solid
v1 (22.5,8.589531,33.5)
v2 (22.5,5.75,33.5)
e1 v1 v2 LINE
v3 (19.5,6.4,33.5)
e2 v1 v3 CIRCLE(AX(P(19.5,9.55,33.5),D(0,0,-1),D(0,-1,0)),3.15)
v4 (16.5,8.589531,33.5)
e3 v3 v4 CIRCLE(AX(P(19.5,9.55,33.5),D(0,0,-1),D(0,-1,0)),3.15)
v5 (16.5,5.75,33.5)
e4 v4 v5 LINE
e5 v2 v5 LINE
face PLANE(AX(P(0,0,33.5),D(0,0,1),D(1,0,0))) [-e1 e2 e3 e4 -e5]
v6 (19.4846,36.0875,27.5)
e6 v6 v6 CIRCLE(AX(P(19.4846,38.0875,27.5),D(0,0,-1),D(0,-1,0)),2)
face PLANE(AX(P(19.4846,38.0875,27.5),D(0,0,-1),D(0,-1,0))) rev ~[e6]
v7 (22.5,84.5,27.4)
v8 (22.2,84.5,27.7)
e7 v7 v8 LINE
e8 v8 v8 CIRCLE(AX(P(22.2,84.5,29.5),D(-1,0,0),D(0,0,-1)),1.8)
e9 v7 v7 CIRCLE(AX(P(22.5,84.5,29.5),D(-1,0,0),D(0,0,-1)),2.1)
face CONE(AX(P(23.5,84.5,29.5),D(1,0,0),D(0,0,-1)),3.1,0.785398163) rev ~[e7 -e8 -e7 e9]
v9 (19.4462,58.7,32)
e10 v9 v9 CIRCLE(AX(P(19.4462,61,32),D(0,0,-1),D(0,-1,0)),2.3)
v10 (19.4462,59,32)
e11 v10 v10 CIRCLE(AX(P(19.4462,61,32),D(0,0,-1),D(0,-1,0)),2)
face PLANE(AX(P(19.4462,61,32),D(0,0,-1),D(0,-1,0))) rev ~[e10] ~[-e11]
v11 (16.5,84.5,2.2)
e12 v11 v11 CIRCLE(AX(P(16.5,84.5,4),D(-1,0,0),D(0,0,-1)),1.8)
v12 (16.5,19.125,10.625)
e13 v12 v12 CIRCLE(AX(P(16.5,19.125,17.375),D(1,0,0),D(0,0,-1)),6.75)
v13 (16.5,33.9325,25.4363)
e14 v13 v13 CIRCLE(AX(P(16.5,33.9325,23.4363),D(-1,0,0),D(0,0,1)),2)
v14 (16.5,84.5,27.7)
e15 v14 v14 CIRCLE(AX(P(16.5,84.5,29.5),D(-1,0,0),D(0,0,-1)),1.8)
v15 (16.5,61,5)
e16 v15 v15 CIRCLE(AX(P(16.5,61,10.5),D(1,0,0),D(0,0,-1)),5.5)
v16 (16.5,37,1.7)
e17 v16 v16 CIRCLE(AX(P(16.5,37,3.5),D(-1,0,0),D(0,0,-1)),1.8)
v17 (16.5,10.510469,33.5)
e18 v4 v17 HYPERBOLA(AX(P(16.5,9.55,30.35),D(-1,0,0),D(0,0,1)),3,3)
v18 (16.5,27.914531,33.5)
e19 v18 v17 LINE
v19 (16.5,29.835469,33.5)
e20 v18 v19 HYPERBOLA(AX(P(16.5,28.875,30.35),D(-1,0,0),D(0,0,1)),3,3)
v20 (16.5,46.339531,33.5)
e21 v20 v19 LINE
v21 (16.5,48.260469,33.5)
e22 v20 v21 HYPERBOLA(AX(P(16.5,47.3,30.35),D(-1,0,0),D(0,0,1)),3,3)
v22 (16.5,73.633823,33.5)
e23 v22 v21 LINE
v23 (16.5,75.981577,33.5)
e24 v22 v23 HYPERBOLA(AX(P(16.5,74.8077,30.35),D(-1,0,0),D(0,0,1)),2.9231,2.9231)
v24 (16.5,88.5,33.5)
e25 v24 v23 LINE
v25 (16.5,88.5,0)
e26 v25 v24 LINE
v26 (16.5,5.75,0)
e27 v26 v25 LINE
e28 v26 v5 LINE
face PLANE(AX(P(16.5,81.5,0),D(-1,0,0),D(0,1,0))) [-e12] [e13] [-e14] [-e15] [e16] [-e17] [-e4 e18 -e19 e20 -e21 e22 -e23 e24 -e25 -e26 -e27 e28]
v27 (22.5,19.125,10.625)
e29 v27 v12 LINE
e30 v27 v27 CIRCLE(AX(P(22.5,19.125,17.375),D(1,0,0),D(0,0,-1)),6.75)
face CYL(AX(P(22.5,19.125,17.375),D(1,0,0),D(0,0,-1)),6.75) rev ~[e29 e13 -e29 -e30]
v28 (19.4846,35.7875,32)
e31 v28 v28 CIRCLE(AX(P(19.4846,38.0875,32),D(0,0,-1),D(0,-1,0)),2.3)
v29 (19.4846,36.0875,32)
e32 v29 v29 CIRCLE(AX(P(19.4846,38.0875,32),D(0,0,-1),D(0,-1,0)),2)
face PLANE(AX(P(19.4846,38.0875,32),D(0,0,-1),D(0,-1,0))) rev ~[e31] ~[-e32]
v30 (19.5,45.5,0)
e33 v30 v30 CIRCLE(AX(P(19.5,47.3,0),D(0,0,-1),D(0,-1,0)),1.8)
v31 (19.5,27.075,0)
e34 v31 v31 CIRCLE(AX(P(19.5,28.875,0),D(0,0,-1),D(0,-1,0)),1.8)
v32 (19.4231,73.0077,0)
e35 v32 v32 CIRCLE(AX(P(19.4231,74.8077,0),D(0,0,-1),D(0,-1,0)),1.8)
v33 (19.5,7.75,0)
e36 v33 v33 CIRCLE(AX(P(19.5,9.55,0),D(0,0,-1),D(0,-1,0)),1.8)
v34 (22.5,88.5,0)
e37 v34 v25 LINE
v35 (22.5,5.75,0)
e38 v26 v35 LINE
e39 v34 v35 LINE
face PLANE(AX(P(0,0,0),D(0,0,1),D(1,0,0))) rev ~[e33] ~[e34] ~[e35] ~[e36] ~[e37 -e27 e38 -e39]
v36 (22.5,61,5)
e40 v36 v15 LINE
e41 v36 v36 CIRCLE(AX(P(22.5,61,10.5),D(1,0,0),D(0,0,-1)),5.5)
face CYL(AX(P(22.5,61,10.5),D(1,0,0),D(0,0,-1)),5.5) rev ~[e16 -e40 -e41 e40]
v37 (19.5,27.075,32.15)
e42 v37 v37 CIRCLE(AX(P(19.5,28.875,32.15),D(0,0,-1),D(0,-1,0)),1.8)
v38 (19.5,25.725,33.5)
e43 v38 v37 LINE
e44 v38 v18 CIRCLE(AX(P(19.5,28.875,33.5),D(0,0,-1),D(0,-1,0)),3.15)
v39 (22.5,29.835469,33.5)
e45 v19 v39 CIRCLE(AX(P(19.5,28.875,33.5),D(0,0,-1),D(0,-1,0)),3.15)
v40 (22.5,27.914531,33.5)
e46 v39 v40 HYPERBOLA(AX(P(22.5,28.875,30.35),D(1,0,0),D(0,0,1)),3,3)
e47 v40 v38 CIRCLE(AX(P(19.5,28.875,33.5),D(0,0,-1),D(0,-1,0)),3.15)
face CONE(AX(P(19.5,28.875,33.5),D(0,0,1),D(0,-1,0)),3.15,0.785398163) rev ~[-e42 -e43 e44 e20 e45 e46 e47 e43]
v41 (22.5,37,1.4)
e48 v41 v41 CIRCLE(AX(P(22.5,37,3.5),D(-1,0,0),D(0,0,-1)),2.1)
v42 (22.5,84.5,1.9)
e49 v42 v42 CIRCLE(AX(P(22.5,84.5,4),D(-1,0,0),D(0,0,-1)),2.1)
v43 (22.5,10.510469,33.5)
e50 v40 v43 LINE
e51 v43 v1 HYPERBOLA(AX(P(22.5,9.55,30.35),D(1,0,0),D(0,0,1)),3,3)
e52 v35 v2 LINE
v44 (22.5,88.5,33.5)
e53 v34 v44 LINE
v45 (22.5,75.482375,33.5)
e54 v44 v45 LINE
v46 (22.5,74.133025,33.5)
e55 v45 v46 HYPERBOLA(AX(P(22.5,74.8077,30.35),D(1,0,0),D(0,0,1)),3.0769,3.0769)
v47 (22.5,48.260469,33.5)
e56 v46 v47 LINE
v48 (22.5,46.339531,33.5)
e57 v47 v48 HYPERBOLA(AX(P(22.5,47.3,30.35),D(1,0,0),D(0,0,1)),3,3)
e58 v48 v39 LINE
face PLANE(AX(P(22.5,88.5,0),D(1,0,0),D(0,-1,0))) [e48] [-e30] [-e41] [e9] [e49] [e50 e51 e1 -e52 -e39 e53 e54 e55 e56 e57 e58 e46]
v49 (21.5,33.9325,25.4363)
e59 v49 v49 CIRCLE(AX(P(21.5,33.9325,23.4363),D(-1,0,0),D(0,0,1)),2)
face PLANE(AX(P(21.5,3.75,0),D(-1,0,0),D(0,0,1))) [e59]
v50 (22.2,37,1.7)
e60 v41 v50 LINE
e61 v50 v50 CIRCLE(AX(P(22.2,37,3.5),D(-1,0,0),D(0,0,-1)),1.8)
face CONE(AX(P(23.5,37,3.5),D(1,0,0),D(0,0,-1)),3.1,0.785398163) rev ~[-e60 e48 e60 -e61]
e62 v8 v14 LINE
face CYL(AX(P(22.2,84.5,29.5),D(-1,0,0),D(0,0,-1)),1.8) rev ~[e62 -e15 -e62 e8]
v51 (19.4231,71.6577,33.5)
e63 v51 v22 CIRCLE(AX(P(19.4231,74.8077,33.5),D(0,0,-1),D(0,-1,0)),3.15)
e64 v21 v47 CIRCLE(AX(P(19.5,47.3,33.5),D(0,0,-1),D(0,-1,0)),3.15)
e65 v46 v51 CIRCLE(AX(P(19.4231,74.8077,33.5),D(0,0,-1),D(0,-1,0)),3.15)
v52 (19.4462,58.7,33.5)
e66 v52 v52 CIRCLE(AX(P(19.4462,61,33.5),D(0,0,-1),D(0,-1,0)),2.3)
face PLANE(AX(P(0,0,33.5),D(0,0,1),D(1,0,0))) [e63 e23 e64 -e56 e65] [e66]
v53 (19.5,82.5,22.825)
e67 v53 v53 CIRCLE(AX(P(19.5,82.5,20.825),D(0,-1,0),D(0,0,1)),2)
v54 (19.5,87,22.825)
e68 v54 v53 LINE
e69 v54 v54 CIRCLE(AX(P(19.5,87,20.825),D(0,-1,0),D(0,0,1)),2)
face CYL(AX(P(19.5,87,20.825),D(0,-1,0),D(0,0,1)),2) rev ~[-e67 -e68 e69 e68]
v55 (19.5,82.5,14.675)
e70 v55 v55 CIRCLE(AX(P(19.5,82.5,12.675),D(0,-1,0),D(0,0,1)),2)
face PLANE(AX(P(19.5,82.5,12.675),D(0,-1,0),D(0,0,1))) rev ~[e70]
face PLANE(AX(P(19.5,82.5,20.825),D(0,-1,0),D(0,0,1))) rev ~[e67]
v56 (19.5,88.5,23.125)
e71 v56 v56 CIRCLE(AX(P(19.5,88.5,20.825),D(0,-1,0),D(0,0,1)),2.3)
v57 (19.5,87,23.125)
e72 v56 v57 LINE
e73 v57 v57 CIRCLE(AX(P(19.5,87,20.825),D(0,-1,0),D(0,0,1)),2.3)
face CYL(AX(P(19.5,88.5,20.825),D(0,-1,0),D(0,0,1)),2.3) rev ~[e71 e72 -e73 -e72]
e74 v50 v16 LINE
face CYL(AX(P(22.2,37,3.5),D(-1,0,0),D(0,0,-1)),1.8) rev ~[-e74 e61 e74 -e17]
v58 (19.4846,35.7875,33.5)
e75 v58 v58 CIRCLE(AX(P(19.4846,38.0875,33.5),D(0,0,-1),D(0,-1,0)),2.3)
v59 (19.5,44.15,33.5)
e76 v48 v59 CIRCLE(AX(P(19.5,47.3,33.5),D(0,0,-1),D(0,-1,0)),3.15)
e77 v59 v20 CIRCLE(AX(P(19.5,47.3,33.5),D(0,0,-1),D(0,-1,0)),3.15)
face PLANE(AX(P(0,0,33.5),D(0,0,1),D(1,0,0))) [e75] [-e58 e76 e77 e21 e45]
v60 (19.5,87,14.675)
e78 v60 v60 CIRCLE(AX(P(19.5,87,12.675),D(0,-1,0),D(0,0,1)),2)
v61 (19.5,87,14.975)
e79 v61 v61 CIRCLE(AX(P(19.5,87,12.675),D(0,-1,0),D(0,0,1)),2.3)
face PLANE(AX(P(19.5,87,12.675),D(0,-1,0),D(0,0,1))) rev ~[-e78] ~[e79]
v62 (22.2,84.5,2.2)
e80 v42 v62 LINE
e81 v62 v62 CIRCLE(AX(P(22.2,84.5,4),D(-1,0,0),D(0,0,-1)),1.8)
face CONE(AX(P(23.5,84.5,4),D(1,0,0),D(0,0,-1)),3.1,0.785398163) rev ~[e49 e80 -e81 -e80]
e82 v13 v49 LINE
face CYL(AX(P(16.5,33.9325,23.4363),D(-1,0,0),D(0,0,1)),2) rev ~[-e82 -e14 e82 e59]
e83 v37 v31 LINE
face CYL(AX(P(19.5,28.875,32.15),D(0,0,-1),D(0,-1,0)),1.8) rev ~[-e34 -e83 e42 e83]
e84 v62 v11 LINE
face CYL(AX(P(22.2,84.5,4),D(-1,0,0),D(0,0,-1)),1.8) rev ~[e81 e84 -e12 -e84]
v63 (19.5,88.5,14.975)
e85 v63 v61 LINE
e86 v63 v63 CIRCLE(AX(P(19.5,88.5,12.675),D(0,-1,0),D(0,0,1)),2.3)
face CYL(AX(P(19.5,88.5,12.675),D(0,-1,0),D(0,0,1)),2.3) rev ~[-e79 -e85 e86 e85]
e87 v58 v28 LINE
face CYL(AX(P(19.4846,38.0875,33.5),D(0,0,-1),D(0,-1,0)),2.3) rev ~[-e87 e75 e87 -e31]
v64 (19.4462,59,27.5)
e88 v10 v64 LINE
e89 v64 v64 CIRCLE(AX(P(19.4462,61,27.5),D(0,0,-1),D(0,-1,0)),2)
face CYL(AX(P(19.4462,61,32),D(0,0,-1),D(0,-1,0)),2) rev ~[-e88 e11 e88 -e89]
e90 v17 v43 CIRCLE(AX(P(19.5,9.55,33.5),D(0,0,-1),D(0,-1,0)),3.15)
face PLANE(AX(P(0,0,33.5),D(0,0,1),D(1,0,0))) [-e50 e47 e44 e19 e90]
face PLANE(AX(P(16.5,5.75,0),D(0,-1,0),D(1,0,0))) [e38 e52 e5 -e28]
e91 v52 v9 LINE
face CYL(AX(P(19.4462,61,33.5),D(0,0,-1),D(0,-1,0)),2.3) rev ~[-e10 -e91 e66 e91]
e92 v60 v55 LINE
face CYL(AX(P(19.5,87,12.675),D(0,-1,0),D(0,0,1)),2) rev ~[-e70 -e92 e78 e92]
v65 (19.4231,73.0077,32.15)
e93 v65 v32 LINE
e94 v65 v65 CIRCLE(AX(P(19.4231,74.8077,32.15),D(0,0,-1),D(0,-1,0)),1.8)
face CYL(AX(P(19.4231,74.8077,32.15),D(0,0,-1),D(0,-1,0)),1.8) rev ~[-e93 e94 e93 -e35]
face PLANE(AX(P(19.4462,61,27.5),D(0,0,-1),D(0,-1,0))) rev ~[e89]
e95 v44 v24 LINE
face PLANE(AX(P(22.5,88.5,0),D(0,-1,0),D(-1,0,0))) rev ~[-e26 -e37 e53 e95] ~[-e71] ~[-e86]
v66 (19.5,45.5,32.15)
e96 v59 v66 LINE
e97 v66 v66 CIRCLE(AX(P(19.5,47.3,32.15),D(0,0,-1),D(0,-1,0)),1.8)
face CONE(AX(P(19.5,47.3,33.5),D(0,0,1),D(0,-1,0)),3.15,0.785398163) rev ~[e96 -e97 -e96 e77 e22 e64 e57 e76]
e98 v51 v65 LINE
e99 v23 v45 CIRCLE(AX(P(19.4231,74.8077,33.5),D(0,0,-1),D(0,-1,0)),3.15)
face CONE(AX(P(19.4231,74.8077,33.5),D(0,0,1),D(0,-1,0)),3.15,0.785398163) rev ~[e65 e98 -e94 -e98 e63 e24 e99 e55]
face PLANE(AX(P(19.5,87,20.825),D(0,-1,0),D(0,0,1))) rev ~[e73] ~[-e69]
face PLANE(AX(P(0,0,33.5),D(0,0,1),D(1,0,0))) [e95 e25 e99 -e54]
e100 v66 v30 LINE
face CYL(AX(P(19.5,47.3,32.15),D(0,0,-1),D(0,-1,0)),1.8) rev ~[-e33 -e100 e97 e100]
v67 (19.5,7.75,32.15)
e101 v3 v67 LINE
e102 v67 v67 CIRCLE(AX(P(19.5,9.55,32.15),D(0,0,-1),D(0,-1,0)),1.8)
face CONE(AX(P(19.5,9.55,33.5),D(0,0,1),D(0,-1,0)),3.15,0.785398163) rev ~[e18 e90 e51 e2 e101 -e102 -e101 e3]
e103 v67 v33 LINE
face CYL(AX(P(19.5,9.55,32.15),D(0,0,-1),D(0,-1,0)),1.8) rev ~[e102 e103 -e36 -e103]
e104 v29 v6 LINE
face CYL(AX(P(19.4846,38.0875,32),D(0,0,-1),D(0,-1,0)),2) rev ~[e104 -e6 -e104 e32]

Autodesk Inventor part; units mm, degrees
ref_plane "YZ Plane" through (0, 0, 0) normal (1, 0, 0) x (0, 1, 0)
ref_plane "XZ Plane" through (0, 0, 0) normal (0, 1, 0) x (-1, 0, 0)
ref_plane "Work Plane1" through (0, 0, 0) normal (0, 0, 1) x (1, 0, 0)
sketch "Sketch1" plane through (0, 0, 0) normal (0, 0, 1) x (1, 0, 0)
  line L0 (23.5, 88.5) -> (-23.5, 88.5) projected
  line L1 (-23.5, 88.5) -> (-23.5, 36.5) projected
  line L2 (-26.5, 33.5) -> (-89, 33.5) projected
  line L3 (-89, 33.5) -> (-89, -72.5) projected
  line L4 (-89, -72.5) -> (-77, -72.5) projected
  line L5 (-74, -75.5) -> (-74, -93.5) projected
  line L6 (-74, -93.5) -> (74, -93.5) projected
  line L7 (74, -93.5) -> (74, -75.5) projected
  line L8 (77, -72.5) -> (89, -72.5) projected
  line L9 (89, -72.5) -> (89, 33.5) projected
  line L10 (89, 33.5) -> (26.5, 33.5) projected
  line L11 (23.5, 36.5) -> (23.5, 88.5) projected
  line L12 (-4.5, 81.5) -> (-4.5, 36.5) projected
  line L13 (-7.5, 33.5) -> (-13.5, 33.5) projected
  line L14 (-16.5, 36.5) -> (-16.5, 81.5) projected
  line L15 (7.5, 84.5) -> (13.5, 84.5) projected
  line L16 (16.5, 81.5) -> (16.5, 36.5) projected
  line L17 (13.5, 33.5) -> (7.5, 33.5) projected
  line L18 (4.5, 36.5) -> (4.5, 81.5) projected
  line L19 (-13.5, 84.5) -> (-7.5, 84.5) projected
  line L20 (16.5, 88.5) -> (22.5, 88.5)
  line L21 (22.5, 88.5) -> (22.5, 3.75)
  line L22 (22.5, 3.75) -> (16.5, 3.75)
  line L23 (16.5, 3.75) -> (16.5, 88.5)
  line L24 (59.9, 4.75) -> (32.2, 4.75)
  arc A0 (13.5, 33.5) -> (16.5, 36.5) centre (13.5, 36.5) ccw projected
  arc A1 (4.5, 36.5) -> (7.5, 33.5) centre (7.5, 36.5) ccw projected
  arc A2 (7.5, 84.5) -> (4.5, 81.5) centre (7.5, 81.5) ccw projected
  arc A3 (16.5, 81.5) -> (13.5, 84.5) centre (13.5, 81.5) ccw projected
  arc A4 (-4.5, 81.5) -> (-7.5, 84.5) centre (-7.5, 81.5) ccw projected
  arc A5 (-7.5, 33.5) -> (-4.5, 36.5) centre (-7.5, 36.5) ccw projected
  arc A6 (-16.5, 36.5) -> (-13.5, 33.5) centre (-13.5, 36.5) ccw projected
  arc A7 (-13.5, 84.5) -> (-16.5, 81.5) centre (-13.5, 81.5) ccw projected
  arc A8 (-26.5, 33.5) -> (-23.5, 36.5) centre (-26.5, 36.5) ccw projected
  arc A9 (-74, -75.5) -> (-77, -72.5) centre (-77, -75.5) ccw projected
  arc A10 (77, -72.5) -> (74, -75.5) centre (77, -75.5) ccw projected
  arc A11 (23.5, 36.5) -> (26.5, 33.5) centre (26.5, 36.5) ccw projected
  circle A12 centre (39.125, 25.9125) radius 1.0065 projected
  circle A13 centre (72.95, 12.275) radius 1.0065 projected
  circle A14 centre (86, 30.5) radius 1.0065 projected
  circle A15 centre (-86, 30.5) radius 1.0065 projected
  circle A16 centre (-39.125, 12.3375) radius 1.0065 projected
  circle A17 centre (-72.95, 25.975) radius 1.0065 projected
  circle A18 centre (-72.95, 12.275) radius 1.0065 projected
  circle A19 centre (-39.125, 25.9125) radius 1.0065 projected
  circle A20 centre (-86, 7.75) radius 1.0065 projected
  circle A21 centre (86, 7.75) radius 1.0065 projected
  circle A22 centre (72.95, 25.975) radius 1.0065 projected
  circle A23 centre (39.125, 12.3375) radius 1.0065 projected
  circle A24 centre (-24.1, -73.1) radius 1.2295 projected
  circle A25 centre (-42.4984, -44.6666) radius 1.2295 projected
  circle A26 centre (-79, -42.3889) radius 1.2295 projected
  circle A27 centre (-19.5, 28.875) radius 1.2295 projected
  circle A28 centre (19.5, 9.55) radius 1.2295 projected
  circle A29 centre (19.5, 47.3) radius 1.2295 projected
  circle A30 centre (-19.5, 47.3) radius 1.2295 projected
  circle A31 centre (0, 74.7) radius 1.2295 projected
  circle A32 centre (-19.4231, 74.8077) radius 1.2295 projected
  circle A33 centre (19.5, 74.7) radius 1.2295 projected
  circle A34 centre (0, 49.05) radius 1.2295 projected
  circle A35 centre (19.5, 28.875) radius 1.2295 projected
  circle A36 centre (0, 19.125) radius 1.2295 projected
  circle A37 centre (-19.5, 9.55) radius 1.2295 projected
  circle A38 centre (24.1, -73.1) radius 1.2295 projected
  circle A39 centre (42.5, -44.6649) radius 1.2295 projected
  circle A40 centre (79, -42.3889) radius 1.2295 projected
  circle A41 centre (21.5, -85.5) radius 1.8 projected
  circle A42 centre (-64.5, -85.5) radius 1.8 projected
  circle A43 centre (-83.4, -19.2889) radius 1.8 projected
  circle A44 centre (-21.5, -85.5) radius 1.8 projected
  circle A45 centre (64.5, -85.5) radius 1.8 projected
  line L25 (-58.2315, -77.6013) -> (-77.7685, -63.3434) projected
  line L26 (-79, -36.3889) -> (-79, 1.75) projected
  line L27 (-75.7766, -45.4056) -> (-47.1423, -47.5438) projected
  line L28 (-21.1, -26.5751) -> (-21.1, -22.0255) projected
  line L29 (-46.9357, -41.5592) -> (-76, -39.3889) projected
  line L30 (-79, -60.9201) -> (-79, -48.3972) projected
  line L31 (32.0924, 4.75) -> (76, 4.75) projected
  line L32 (79, 1.75) -> (79, -36.3889) projected
  line L33 (76, -39.3889) -> (46.9371, -41.5577) projected
  line L34 (21.1, -22.0255) -> (21.1, -26.5749) projected
  line L35 (47.144, -47.5423) -> (76, -45.3889) projected
  line L36 (79, -48.3889) -> (79, -60.9201) projected
  line L37 (77.7685, -63.3434) -> (58.2315, -77.6013) projected
  line L38 (57, -80.0246) -> (57, -87.5) projected
  arc A46 (55, -89.5) -> (57, -87.5) centre (55, -87.5) ccw projected
  line L39 (55, -89.5) -> (31, -89.5) projected
  arc A47 (29, -87.5) -> (31, -89.5) centre (31, -87.5) ccw projected
  line L40 (29, -87.5) -> (29, -79.2522) projected
  line L41 (14, -79.5039) -> (14, -87.5) projected
  arc A48 (12, -89.5) -> (14, -87.5) centre (12, -87.5) ccw projected
  line L42 (12, -89.5) -> (-12, -89.5) projected
  arc A49 (-14, -87.5) -> (-12, -89.5) centre (-12, -87.5) ccw projected
  line L43 (-14, -87.5) -> (-14, -79.5039) projected
  line L44 (-29, -79.2522) -> (-29, -87.5) projected
  arc A50 (-31, -89.5) -> (-29, -87.5) centre (-31, -87.5) ccw projected
  line L45 (-31, -89.5) -> (-55, -89.5) projected
  arc A51 (-57, -87.5) -> (-55, -89.5) centre (-55, -87.5) ccw projected
  line L46 (-57, -87.5) -> (-57, -80.0246) projected
  line L47 (-66.95, 28.9125) -> (-45.125, 28.9125) projected
  line L48 (-42.125, 25.9125) -> (-42.125, 12.275) projected
  line L49 (-45.125, 9.275) -> (-66.95, 9.275) projected
  line L50 (-69.95, 12.275) -> (-69.95, 25.9125) projected
  line L51 (-16.5, 12.75) -> (-16.5, 25.5) projected
  line L52 (-13.5, 28.5) -> (-7.5, 28.5) projected
  line L53 (-4.5, 25.5) -> (-4.5, 12.75) projected
  line L54 (-7.5, 9.75) -> (-13.5, 9.75) projected
  line L55 (66.95, 9.3375) -> (45.125, 9.3375) projected
  line L56 (42.125, 12.3375) -> (42.125, 25.975) projected
  line L57 (45.125, 28.975) -> (66.95, 28.975) projected
  line L58 (69.95, 25.975) -> (69.95, 12.3375) projected
  line L59 (4.5, 12.75) -> (4.5, 25.5) projected
  line L60 (7.5, 28.5) -> (13.5, 28.5) projected
  line L61 (16.5, 25.5) -> (16.5, 12.75) projected
  line L62 (13.5, 9.75) -> (7.5, 9.75) projected
  line L63 (44.5181, -40.6102) -> (28.0046, -22.8717) projected
  line L64 (27.2109, -20.577) -> (29.1029, 2.0005) projected
  line L65 (-44.7206, -49.1201) -> (-29.3549, -77.8368) projected
  line L66 (-76, 4.75) -> (-32.0924, 4.75) projected
  line L67 (-29.1029, 2.0005) -> (-27.2109, -20.5772) projected
  line L68 (-28.0044, -22.8717) -> (-44.5164, -40.6115) projected
  line L69 (29.3549, -77.8368) -> (44.7222, -49.1185) projected
  line L70 (-14.6042, -77.6983) -> (-37.8537, -46.8489) projected
  line L71 (-37.4786, -42.8259) -> (-22.0793, -28.7924) projected
  line L72 (-21.1105, -21.775) -> (-23.0609, 1.4995) projected
  line L73 (-20.0714, 4.75) -> (20.0714, 4.75) projected
  line L74 (23.0609, 1.4995) -> (21.1105, -21.775) projected
  line L75 (22.0795, -28.7925) -> (37.4798, -42.8243) projected
  line L76 (37.8551, -46.8475) -> (14.6042, -77.6983) projected
  circle A52 centre (-78, -67.1725) radius 1.2295 projected
  arc A53 (76, -39.3889) -> (79, -36.3889) centre (76, -36.3889) ccw projected
  arc A54 (44.5181, -40.6102) -> (46.9371, -41.5577) centre (46.7138, -38.566) ccw projected
  arc A55 (27.2109, -20.577) -> (28.0046, -22.8717) centre (30.2004, -20.8276) ccw projected
  arc A56 (32.0924, 4.75) -> (29.1029, 2.0005) centre (32.0924, 1.75) ccw projected
  arc A57 (79, 1.75) -> (76, 4.75) centre (76, 1.75) ccw projected
  arc A58 (-42.125, 25.9125) -> (-45.125, 28.9125) centre (-45.125, 25.9125) ccw projected
  arc A59 (-45.125, 9.275) -> (-42.125, 12.275) centre (-45.125, 12.275) ccw projected
  arc A60 (-69.95, 12.275) -> (-66.95, 9.275) centre (-66.95, 12.275) ccw projected
  arc A61 (-66.95, 28.9125) -> (-69.95, 25.9125) centre (-66.95, 25.9125) ccw projected
  arc A62 (-13.5, 28.5) -> (-16.5, 25.5) centre (-13.5, 25.5) ccw projected
  arc A63 (-4.5, 25.5) -> (-7.5, 28.5) centre (-7.5, 25.5) ccw projected
  arc A64 (-7.5, 9.75) -> (-4.5, 12.75) centre (-7.5, 12.75) ccw projected
  arc A65 (-16.5, 12.75) -> (-13.5, 9.75) centre (-13.5, 12.75) ccw projected
  arc A66 (58.2315, -77.6013) -> (57, -80.0246) centre (60, -80.0246) ccw projected
  arc A67 (29.3549, -77.8368) -> (29, -79.2522) centre (32, -79.2522) ccw projected
  arc A68 (47.144, -47.5423) -> (44.7222, -49.1185) centre (47.3673, -50.5339) ccw projected
  arc A69 (79, -48.3889) -> (76, -45.3889) centre (76, -48.3889) ccw projected
  arc A70 (77.7685, -63.3434) -> (79, -60.9201) centre (76, -60.9201) ccw projected
  arc A71 (-21.1, -22.0255) -> (-21.1105, -21.775) centre (-24.1, -22.0255) ccw projected
  arc A72 (-20.0714, 4.75) -> (-23.0609, 1.4995) centre (-20.0714, 1.75) ccw projected
  arc A73 (23.0609, 1.4995) -> (20.0714, 4.75) centre (20.0714, 1.75) ccw projected
  arc A74 (21.1105, -21.775) -> (21.1, -22.0255) centre (24.1, -22.0255) ccw projected
  arc A75 (21.1, -26.5749) -> (22.0795, -28.7925) centre (24.1, -26.5749) ccw projected
  arc A76 (37.8551, -46.8475) -> (37.4798, -42.8243) centre (35.4593, -45.0419) ccw projected
  arc A77 (14.6042, -77.6983) -> (14, -79.5039) centre (17, -79.5039) ccw projected
  arc A78 (-14, -79.5039) -> (-14.6042, -77.6983) centre (-17, -79.5039) ccw projected
  arc A79 (-37.4786, -42.8259) -> (-37.8537, -46.8489) centre (-35.4579, -45.0433) ccw projected
  arc A80 (-22.0793, -28.7924) -> (-21.1, -26.5751) centre (-24.1, -26.5751) ccw projected
  arc A81 (-79, -36.3889) -> (-76, -39.3889) centre (-76, -36.3889) ccw projected
  arc A82 (-76, 4.75) -> (-79, 1.75) centre (-76, 1.75) ccw projected
  arc A83 (-29.1029, 2.0005) -> (-32.0924, 4.75) centre (-32.0924, 1.75) ccw projected
  arc A84 (-28.0044, -22.8717) -> (-27.2109, -20.5772) centre (-30.2004, -20.8277) ccw projected
  arc A85 (-46.9357, -41.5592) -> (-44.5164, -40.6115) centre (-46.7123, -38.5676) ccw projected
  arc A86 (7.5, 28.5) -> (4.5, 25.5) centre (7.5, 25.5) ccw projected
  arc A87 (16.5, 25.5) -> (13.5, 28.5) centre (13.5, 25.5) ccw projected
  arc A88 (13.5, 9.75) -> (16.5, 12.75) centre (13.5, 12.75) ccw projected
  arc A89 (4.5, 12.75) -> (7.5, 9.75) centre (7.5, 12.75) ccw projected
  arc A90 (-57, -80.0246) -> (-58.2315, -77.6013) centre (-60, -80.0246) ccw projected
  arc A91 (-79, -60.9201) -> (-77.7685, -63.3434) centre (-76, -60.9201) ccw projected
  arc A92 (-75.7766, -45.4056) -> (-79, -48.3972) centre (-76, -48.3972) ccw projected
  arc A93 (-44.7206, -49.1201) -> (-47.1423, -47.5438) centre (-47.3657, -50.5355) ccw projected
  arc A94 (-29, -79.2522) -> (-29.3549, -77.8368) centre (-32, -79.2522) ccw projected
  arc A95 (42.125, 12.3375) -> (45.125, 9.3375) centre (45.125, 12.3375) ccw projected
  arc A96 (45.125, 28.975) -> (42.125, 25.975) centre (45.125, 25.975) ccw projected
  arc A97 (69.95, 25.975) -> (66.95, 28.975) centre (66.95, 25.975) ccw projected
  arc A98 (66.95, 9.3375) -> (69.95, 12.3375) centre (66.95, 12.3375) ccw projected
  circle A99 centre (78, -67.1725) radius 1.2295 projected
  circle A100 centre (83.4, -16.3889) radius 1.8 projected
  circle A101 centre (24.1, -24.9) radius 1.2295 projected
  circle A102 centre (-24.1, -24.9) radius 1.2295 projected
  point P0 (0, 0)
  point P1 (7.5, 81.5)
  point P2 (13.5, 81.5)
  point P3 (-7.5, 81.5)
  point P4 (-13.5, 81.5)
  point P5 (39, -44.2094)
  point P6 (16.5, 28.5)
  point P7 (16.5, 9.75)
  point P8 (-79, -67.8878)
  point P9 (-79, -66.4572)
  dimension "d0" = 1
  dimension "d1" = 1
ref_plane "Work Plane2" through (-89, -40.3889, 33.5) normal (0, 0, 1) x (1, 0, 0)
extrude "Extrusion1" add sketch "Sketch1" along normal up to surface (33.5 mm away) contours L21 L22 A73 L73 L23 L16 L0 | L22 L23 L73 A73 | A28 | A29 | A33 | A35
sketch "Sketch2" plane through (22.5, 3.75, 0) normal (1, 0, 0) x (0, 0, -1)
  circle A0 centre (-17.375, 15.375) radius 6.75 projected
  circle A1 centre (-10.5, 57.25) radius 5.5 projected
  point P0 (0, -3.75)
  dimension "d8" = 11
extrude "Extrusion2" cut sketch "Sketch2" against normal up to next
sketch "Sketch3" plane through (16.5, 3.75, 0) normal (-1, 0, 0) x (0, 0, 1)
  circle A0 centre (23.4363, 30.1825) radius 2 projected
  point P0 (0, -3.75)
extrude "Extrusion3" cut sketch "Sketch3" against normal blind 5
ref_plane "Work Plane3" through (23.5, 3.75, 0) normal (1, 0, 0) x (0, 0, -1)
sketch "Sketch4" plane through (23.5, 3.75, 0) normal (1, 0, 0) x (0, 0, -1)
  circle A0 centre (-29.5, 80.75) radius 1.8 projected
  circle A1 centre (-3.5, 33.25) radius 1.8 projected
  circle A2 centre (-4, 80.75) radius 1.8 projected
  point P0 (0, -3.75)
hole "Hole1" at (23.5, 37, 3.5) at (23.5, 84.5, 4) at (23.5, 84.5, 29.5) direction (-1, 0, 0) diameter 3.6 end through all countersink diameter 6.2 countersink angle 90 clearance for "Countersunk Flat Head Screw ISO 2009/7046" size "M3" standard "ISO"
sketch "Sketch5" plane through (16.5, 3.75, 33.5) normal (0, 0, 1) x (1, 0, 0)
  circle A0 centre (-36, 5.8) radius 1.8 projected
  circle A1 centre (-36, 25.125) radius 1.8 projected
  circle A2 centre (-36, 43.55) radius 1.8 projected
  circle A3 centre (-35.9231, 71.0577) radius 1.8 projected
  circle A4 centre (-16.5, 45.3) radius 3.3 projected
  circle A5 centre (-16.5, 15.375) radius 3.3 projected
  circle A6 centre (-16.5, 70.95) radius 3.3 projected
  line L0 (-12, 2) -> (-21, 2) projected
  line L1 (-12, 84.75) -> (-12, 2) projected
  line L2 (-21, 84.75) -> (-12, 84.75) projected
  line L3 (-21, 2) -> (-21, 84.75) projected
  line L4 (-16.5, 2) -> (-16.5, 84.75)
  circle A7 centre (3, 5.8) radius 1.8
  circle A8 centre (3, 25.125) radius 1.8
  circle A9 centre (3, 43.55) radius 1.8
  circle A10 centre (2.9231, 71.0577) radius 1.8
  circle A11 centre (-16.5, 30.7161) radius 2.3 projected
  circle A12 centre (-16.5, 59.25) radius 2.3 projected
  point P0 (-16.5, -3.75)
hole "Hole2" at (19.5, 9.55, 33.5) at (19.5, 28.875, 33.5) at (19.5, 47.3, 33.5) at (19.4231, 74.8077, 33.5) direction (0, 0, -1) diameter 3.6 end through all countersink diameter 6.3 countersink angle 90 clearance for "Countersunk Flat Head Screw ISO 2009/7046" size "M3" standard "ISO"
sketch "Sketch7" plane through (16.5, 88.5, 0) normal (0, 1, 0) x (1, 0, 0)
  line L0 (0, -33.5) -> (6, -33.5) projected
  line L1 (6, 0) -> (6, -33.5) projected
  line L2 (6, 0) -> (0, 0) projected
  line L3 (0, 0) -> (0, -33.5) projected
  circle A0 centre (-16.5, -12.675) radius 2 projected
  circle A1 centre (-16.5, -20.825) radius 2 projected
  line L4 (-16.5, -20.825) -> (6, -20.825)
  line L5 (-16.5, -12.675) -> (6, -12.675)
  line L6 (6, -5) -> (6, -16) projected
  point P0 (-16.5, 0)
  point P1 (3, -20.825)
  point P2 (3, -12.675)
hole "Hole4" at (19.5, 88.5, 20.825) at (19.5, 88.5, 12.675) direction (0, -1, 0) diameter 4 depth 6 counterbore diameter 4.6 counterbore depth 1.5
sketch "Sketch8" plane through (19.5, 47.3, 33.5) normal (0, 0, 1) x (1, 0, 0)
  circle A0 centre (-39, -9.2125) radius 2.3 projected
  circle A1 centre (-39, 13.7) radius 2.3 projected
  arc A2 (3, 0.9605) -> (-3, 0.9605) centre (0, 0) ccw projected
  line L0 (3, 26.8331) -> (3, 0.9605) projected
  arc A3 (-3, 26.3338) -> (3, 26.8331) centre (-0.0769, 27.5077) ccw projected
  line L1 (-3, 0.9605) -> (-3, 26.3338) projected
  arc A4 (-3, -0.9605) -> (3, -0.9605) centre (0, 0) ccw projected
  line L2 (-3, -17.4645) -> (-3, -0.9605) projected
  arc A5 (3, -17.4645) -> (-3, -17.4645) centre (0, -18.425) ccw projected
  line L3 (3, -0.9605) -> (3, -17.4645) projected
  line L4 (-39, 13.7) -> (3, 13.7)
  line L5 (3, 19.2) -> (3, 8.2) projected
  line L6 (-39, -9.2125) -> (3, -9.2125)
  circle A6 centre (0, -18.425) radius 1.8 projected
  line L7 (0, -18.425) -> (-0.0769, 27.5077)
  point P0 (-19.5, -47.3)
  point P1 (-0.0538, 13.7)
  point P2 (-0.0154, -9.2125)
hole "Hole5" at (19.4462, 61, 33.5) at (19.4846, 38.0875, 33.5) direction (0, 0, -1) diameter 4 depth 6 counterbore diameter 4.6 counterbore depth 1.5
sketch "Sketch9" plane through (16.5, 3.75, 0) normal (0, -1, 0) x (1, 0, 0)
  line L0 (0, 0) -> (0, 33.5) projected
  line L1 (0, 0) -> (6, 0) projected
  line L2 (6, 0) -> (6, 33.5) projected
  line L3 (6, 33.5) -> (0, 33.5) projected
  point P0 (-16.5, 0)
extrude "Extrusion4" cut sketch "Sketch9" against normal blind 2
properties part number "left_gear_holder" material "Nylon 6/6"
